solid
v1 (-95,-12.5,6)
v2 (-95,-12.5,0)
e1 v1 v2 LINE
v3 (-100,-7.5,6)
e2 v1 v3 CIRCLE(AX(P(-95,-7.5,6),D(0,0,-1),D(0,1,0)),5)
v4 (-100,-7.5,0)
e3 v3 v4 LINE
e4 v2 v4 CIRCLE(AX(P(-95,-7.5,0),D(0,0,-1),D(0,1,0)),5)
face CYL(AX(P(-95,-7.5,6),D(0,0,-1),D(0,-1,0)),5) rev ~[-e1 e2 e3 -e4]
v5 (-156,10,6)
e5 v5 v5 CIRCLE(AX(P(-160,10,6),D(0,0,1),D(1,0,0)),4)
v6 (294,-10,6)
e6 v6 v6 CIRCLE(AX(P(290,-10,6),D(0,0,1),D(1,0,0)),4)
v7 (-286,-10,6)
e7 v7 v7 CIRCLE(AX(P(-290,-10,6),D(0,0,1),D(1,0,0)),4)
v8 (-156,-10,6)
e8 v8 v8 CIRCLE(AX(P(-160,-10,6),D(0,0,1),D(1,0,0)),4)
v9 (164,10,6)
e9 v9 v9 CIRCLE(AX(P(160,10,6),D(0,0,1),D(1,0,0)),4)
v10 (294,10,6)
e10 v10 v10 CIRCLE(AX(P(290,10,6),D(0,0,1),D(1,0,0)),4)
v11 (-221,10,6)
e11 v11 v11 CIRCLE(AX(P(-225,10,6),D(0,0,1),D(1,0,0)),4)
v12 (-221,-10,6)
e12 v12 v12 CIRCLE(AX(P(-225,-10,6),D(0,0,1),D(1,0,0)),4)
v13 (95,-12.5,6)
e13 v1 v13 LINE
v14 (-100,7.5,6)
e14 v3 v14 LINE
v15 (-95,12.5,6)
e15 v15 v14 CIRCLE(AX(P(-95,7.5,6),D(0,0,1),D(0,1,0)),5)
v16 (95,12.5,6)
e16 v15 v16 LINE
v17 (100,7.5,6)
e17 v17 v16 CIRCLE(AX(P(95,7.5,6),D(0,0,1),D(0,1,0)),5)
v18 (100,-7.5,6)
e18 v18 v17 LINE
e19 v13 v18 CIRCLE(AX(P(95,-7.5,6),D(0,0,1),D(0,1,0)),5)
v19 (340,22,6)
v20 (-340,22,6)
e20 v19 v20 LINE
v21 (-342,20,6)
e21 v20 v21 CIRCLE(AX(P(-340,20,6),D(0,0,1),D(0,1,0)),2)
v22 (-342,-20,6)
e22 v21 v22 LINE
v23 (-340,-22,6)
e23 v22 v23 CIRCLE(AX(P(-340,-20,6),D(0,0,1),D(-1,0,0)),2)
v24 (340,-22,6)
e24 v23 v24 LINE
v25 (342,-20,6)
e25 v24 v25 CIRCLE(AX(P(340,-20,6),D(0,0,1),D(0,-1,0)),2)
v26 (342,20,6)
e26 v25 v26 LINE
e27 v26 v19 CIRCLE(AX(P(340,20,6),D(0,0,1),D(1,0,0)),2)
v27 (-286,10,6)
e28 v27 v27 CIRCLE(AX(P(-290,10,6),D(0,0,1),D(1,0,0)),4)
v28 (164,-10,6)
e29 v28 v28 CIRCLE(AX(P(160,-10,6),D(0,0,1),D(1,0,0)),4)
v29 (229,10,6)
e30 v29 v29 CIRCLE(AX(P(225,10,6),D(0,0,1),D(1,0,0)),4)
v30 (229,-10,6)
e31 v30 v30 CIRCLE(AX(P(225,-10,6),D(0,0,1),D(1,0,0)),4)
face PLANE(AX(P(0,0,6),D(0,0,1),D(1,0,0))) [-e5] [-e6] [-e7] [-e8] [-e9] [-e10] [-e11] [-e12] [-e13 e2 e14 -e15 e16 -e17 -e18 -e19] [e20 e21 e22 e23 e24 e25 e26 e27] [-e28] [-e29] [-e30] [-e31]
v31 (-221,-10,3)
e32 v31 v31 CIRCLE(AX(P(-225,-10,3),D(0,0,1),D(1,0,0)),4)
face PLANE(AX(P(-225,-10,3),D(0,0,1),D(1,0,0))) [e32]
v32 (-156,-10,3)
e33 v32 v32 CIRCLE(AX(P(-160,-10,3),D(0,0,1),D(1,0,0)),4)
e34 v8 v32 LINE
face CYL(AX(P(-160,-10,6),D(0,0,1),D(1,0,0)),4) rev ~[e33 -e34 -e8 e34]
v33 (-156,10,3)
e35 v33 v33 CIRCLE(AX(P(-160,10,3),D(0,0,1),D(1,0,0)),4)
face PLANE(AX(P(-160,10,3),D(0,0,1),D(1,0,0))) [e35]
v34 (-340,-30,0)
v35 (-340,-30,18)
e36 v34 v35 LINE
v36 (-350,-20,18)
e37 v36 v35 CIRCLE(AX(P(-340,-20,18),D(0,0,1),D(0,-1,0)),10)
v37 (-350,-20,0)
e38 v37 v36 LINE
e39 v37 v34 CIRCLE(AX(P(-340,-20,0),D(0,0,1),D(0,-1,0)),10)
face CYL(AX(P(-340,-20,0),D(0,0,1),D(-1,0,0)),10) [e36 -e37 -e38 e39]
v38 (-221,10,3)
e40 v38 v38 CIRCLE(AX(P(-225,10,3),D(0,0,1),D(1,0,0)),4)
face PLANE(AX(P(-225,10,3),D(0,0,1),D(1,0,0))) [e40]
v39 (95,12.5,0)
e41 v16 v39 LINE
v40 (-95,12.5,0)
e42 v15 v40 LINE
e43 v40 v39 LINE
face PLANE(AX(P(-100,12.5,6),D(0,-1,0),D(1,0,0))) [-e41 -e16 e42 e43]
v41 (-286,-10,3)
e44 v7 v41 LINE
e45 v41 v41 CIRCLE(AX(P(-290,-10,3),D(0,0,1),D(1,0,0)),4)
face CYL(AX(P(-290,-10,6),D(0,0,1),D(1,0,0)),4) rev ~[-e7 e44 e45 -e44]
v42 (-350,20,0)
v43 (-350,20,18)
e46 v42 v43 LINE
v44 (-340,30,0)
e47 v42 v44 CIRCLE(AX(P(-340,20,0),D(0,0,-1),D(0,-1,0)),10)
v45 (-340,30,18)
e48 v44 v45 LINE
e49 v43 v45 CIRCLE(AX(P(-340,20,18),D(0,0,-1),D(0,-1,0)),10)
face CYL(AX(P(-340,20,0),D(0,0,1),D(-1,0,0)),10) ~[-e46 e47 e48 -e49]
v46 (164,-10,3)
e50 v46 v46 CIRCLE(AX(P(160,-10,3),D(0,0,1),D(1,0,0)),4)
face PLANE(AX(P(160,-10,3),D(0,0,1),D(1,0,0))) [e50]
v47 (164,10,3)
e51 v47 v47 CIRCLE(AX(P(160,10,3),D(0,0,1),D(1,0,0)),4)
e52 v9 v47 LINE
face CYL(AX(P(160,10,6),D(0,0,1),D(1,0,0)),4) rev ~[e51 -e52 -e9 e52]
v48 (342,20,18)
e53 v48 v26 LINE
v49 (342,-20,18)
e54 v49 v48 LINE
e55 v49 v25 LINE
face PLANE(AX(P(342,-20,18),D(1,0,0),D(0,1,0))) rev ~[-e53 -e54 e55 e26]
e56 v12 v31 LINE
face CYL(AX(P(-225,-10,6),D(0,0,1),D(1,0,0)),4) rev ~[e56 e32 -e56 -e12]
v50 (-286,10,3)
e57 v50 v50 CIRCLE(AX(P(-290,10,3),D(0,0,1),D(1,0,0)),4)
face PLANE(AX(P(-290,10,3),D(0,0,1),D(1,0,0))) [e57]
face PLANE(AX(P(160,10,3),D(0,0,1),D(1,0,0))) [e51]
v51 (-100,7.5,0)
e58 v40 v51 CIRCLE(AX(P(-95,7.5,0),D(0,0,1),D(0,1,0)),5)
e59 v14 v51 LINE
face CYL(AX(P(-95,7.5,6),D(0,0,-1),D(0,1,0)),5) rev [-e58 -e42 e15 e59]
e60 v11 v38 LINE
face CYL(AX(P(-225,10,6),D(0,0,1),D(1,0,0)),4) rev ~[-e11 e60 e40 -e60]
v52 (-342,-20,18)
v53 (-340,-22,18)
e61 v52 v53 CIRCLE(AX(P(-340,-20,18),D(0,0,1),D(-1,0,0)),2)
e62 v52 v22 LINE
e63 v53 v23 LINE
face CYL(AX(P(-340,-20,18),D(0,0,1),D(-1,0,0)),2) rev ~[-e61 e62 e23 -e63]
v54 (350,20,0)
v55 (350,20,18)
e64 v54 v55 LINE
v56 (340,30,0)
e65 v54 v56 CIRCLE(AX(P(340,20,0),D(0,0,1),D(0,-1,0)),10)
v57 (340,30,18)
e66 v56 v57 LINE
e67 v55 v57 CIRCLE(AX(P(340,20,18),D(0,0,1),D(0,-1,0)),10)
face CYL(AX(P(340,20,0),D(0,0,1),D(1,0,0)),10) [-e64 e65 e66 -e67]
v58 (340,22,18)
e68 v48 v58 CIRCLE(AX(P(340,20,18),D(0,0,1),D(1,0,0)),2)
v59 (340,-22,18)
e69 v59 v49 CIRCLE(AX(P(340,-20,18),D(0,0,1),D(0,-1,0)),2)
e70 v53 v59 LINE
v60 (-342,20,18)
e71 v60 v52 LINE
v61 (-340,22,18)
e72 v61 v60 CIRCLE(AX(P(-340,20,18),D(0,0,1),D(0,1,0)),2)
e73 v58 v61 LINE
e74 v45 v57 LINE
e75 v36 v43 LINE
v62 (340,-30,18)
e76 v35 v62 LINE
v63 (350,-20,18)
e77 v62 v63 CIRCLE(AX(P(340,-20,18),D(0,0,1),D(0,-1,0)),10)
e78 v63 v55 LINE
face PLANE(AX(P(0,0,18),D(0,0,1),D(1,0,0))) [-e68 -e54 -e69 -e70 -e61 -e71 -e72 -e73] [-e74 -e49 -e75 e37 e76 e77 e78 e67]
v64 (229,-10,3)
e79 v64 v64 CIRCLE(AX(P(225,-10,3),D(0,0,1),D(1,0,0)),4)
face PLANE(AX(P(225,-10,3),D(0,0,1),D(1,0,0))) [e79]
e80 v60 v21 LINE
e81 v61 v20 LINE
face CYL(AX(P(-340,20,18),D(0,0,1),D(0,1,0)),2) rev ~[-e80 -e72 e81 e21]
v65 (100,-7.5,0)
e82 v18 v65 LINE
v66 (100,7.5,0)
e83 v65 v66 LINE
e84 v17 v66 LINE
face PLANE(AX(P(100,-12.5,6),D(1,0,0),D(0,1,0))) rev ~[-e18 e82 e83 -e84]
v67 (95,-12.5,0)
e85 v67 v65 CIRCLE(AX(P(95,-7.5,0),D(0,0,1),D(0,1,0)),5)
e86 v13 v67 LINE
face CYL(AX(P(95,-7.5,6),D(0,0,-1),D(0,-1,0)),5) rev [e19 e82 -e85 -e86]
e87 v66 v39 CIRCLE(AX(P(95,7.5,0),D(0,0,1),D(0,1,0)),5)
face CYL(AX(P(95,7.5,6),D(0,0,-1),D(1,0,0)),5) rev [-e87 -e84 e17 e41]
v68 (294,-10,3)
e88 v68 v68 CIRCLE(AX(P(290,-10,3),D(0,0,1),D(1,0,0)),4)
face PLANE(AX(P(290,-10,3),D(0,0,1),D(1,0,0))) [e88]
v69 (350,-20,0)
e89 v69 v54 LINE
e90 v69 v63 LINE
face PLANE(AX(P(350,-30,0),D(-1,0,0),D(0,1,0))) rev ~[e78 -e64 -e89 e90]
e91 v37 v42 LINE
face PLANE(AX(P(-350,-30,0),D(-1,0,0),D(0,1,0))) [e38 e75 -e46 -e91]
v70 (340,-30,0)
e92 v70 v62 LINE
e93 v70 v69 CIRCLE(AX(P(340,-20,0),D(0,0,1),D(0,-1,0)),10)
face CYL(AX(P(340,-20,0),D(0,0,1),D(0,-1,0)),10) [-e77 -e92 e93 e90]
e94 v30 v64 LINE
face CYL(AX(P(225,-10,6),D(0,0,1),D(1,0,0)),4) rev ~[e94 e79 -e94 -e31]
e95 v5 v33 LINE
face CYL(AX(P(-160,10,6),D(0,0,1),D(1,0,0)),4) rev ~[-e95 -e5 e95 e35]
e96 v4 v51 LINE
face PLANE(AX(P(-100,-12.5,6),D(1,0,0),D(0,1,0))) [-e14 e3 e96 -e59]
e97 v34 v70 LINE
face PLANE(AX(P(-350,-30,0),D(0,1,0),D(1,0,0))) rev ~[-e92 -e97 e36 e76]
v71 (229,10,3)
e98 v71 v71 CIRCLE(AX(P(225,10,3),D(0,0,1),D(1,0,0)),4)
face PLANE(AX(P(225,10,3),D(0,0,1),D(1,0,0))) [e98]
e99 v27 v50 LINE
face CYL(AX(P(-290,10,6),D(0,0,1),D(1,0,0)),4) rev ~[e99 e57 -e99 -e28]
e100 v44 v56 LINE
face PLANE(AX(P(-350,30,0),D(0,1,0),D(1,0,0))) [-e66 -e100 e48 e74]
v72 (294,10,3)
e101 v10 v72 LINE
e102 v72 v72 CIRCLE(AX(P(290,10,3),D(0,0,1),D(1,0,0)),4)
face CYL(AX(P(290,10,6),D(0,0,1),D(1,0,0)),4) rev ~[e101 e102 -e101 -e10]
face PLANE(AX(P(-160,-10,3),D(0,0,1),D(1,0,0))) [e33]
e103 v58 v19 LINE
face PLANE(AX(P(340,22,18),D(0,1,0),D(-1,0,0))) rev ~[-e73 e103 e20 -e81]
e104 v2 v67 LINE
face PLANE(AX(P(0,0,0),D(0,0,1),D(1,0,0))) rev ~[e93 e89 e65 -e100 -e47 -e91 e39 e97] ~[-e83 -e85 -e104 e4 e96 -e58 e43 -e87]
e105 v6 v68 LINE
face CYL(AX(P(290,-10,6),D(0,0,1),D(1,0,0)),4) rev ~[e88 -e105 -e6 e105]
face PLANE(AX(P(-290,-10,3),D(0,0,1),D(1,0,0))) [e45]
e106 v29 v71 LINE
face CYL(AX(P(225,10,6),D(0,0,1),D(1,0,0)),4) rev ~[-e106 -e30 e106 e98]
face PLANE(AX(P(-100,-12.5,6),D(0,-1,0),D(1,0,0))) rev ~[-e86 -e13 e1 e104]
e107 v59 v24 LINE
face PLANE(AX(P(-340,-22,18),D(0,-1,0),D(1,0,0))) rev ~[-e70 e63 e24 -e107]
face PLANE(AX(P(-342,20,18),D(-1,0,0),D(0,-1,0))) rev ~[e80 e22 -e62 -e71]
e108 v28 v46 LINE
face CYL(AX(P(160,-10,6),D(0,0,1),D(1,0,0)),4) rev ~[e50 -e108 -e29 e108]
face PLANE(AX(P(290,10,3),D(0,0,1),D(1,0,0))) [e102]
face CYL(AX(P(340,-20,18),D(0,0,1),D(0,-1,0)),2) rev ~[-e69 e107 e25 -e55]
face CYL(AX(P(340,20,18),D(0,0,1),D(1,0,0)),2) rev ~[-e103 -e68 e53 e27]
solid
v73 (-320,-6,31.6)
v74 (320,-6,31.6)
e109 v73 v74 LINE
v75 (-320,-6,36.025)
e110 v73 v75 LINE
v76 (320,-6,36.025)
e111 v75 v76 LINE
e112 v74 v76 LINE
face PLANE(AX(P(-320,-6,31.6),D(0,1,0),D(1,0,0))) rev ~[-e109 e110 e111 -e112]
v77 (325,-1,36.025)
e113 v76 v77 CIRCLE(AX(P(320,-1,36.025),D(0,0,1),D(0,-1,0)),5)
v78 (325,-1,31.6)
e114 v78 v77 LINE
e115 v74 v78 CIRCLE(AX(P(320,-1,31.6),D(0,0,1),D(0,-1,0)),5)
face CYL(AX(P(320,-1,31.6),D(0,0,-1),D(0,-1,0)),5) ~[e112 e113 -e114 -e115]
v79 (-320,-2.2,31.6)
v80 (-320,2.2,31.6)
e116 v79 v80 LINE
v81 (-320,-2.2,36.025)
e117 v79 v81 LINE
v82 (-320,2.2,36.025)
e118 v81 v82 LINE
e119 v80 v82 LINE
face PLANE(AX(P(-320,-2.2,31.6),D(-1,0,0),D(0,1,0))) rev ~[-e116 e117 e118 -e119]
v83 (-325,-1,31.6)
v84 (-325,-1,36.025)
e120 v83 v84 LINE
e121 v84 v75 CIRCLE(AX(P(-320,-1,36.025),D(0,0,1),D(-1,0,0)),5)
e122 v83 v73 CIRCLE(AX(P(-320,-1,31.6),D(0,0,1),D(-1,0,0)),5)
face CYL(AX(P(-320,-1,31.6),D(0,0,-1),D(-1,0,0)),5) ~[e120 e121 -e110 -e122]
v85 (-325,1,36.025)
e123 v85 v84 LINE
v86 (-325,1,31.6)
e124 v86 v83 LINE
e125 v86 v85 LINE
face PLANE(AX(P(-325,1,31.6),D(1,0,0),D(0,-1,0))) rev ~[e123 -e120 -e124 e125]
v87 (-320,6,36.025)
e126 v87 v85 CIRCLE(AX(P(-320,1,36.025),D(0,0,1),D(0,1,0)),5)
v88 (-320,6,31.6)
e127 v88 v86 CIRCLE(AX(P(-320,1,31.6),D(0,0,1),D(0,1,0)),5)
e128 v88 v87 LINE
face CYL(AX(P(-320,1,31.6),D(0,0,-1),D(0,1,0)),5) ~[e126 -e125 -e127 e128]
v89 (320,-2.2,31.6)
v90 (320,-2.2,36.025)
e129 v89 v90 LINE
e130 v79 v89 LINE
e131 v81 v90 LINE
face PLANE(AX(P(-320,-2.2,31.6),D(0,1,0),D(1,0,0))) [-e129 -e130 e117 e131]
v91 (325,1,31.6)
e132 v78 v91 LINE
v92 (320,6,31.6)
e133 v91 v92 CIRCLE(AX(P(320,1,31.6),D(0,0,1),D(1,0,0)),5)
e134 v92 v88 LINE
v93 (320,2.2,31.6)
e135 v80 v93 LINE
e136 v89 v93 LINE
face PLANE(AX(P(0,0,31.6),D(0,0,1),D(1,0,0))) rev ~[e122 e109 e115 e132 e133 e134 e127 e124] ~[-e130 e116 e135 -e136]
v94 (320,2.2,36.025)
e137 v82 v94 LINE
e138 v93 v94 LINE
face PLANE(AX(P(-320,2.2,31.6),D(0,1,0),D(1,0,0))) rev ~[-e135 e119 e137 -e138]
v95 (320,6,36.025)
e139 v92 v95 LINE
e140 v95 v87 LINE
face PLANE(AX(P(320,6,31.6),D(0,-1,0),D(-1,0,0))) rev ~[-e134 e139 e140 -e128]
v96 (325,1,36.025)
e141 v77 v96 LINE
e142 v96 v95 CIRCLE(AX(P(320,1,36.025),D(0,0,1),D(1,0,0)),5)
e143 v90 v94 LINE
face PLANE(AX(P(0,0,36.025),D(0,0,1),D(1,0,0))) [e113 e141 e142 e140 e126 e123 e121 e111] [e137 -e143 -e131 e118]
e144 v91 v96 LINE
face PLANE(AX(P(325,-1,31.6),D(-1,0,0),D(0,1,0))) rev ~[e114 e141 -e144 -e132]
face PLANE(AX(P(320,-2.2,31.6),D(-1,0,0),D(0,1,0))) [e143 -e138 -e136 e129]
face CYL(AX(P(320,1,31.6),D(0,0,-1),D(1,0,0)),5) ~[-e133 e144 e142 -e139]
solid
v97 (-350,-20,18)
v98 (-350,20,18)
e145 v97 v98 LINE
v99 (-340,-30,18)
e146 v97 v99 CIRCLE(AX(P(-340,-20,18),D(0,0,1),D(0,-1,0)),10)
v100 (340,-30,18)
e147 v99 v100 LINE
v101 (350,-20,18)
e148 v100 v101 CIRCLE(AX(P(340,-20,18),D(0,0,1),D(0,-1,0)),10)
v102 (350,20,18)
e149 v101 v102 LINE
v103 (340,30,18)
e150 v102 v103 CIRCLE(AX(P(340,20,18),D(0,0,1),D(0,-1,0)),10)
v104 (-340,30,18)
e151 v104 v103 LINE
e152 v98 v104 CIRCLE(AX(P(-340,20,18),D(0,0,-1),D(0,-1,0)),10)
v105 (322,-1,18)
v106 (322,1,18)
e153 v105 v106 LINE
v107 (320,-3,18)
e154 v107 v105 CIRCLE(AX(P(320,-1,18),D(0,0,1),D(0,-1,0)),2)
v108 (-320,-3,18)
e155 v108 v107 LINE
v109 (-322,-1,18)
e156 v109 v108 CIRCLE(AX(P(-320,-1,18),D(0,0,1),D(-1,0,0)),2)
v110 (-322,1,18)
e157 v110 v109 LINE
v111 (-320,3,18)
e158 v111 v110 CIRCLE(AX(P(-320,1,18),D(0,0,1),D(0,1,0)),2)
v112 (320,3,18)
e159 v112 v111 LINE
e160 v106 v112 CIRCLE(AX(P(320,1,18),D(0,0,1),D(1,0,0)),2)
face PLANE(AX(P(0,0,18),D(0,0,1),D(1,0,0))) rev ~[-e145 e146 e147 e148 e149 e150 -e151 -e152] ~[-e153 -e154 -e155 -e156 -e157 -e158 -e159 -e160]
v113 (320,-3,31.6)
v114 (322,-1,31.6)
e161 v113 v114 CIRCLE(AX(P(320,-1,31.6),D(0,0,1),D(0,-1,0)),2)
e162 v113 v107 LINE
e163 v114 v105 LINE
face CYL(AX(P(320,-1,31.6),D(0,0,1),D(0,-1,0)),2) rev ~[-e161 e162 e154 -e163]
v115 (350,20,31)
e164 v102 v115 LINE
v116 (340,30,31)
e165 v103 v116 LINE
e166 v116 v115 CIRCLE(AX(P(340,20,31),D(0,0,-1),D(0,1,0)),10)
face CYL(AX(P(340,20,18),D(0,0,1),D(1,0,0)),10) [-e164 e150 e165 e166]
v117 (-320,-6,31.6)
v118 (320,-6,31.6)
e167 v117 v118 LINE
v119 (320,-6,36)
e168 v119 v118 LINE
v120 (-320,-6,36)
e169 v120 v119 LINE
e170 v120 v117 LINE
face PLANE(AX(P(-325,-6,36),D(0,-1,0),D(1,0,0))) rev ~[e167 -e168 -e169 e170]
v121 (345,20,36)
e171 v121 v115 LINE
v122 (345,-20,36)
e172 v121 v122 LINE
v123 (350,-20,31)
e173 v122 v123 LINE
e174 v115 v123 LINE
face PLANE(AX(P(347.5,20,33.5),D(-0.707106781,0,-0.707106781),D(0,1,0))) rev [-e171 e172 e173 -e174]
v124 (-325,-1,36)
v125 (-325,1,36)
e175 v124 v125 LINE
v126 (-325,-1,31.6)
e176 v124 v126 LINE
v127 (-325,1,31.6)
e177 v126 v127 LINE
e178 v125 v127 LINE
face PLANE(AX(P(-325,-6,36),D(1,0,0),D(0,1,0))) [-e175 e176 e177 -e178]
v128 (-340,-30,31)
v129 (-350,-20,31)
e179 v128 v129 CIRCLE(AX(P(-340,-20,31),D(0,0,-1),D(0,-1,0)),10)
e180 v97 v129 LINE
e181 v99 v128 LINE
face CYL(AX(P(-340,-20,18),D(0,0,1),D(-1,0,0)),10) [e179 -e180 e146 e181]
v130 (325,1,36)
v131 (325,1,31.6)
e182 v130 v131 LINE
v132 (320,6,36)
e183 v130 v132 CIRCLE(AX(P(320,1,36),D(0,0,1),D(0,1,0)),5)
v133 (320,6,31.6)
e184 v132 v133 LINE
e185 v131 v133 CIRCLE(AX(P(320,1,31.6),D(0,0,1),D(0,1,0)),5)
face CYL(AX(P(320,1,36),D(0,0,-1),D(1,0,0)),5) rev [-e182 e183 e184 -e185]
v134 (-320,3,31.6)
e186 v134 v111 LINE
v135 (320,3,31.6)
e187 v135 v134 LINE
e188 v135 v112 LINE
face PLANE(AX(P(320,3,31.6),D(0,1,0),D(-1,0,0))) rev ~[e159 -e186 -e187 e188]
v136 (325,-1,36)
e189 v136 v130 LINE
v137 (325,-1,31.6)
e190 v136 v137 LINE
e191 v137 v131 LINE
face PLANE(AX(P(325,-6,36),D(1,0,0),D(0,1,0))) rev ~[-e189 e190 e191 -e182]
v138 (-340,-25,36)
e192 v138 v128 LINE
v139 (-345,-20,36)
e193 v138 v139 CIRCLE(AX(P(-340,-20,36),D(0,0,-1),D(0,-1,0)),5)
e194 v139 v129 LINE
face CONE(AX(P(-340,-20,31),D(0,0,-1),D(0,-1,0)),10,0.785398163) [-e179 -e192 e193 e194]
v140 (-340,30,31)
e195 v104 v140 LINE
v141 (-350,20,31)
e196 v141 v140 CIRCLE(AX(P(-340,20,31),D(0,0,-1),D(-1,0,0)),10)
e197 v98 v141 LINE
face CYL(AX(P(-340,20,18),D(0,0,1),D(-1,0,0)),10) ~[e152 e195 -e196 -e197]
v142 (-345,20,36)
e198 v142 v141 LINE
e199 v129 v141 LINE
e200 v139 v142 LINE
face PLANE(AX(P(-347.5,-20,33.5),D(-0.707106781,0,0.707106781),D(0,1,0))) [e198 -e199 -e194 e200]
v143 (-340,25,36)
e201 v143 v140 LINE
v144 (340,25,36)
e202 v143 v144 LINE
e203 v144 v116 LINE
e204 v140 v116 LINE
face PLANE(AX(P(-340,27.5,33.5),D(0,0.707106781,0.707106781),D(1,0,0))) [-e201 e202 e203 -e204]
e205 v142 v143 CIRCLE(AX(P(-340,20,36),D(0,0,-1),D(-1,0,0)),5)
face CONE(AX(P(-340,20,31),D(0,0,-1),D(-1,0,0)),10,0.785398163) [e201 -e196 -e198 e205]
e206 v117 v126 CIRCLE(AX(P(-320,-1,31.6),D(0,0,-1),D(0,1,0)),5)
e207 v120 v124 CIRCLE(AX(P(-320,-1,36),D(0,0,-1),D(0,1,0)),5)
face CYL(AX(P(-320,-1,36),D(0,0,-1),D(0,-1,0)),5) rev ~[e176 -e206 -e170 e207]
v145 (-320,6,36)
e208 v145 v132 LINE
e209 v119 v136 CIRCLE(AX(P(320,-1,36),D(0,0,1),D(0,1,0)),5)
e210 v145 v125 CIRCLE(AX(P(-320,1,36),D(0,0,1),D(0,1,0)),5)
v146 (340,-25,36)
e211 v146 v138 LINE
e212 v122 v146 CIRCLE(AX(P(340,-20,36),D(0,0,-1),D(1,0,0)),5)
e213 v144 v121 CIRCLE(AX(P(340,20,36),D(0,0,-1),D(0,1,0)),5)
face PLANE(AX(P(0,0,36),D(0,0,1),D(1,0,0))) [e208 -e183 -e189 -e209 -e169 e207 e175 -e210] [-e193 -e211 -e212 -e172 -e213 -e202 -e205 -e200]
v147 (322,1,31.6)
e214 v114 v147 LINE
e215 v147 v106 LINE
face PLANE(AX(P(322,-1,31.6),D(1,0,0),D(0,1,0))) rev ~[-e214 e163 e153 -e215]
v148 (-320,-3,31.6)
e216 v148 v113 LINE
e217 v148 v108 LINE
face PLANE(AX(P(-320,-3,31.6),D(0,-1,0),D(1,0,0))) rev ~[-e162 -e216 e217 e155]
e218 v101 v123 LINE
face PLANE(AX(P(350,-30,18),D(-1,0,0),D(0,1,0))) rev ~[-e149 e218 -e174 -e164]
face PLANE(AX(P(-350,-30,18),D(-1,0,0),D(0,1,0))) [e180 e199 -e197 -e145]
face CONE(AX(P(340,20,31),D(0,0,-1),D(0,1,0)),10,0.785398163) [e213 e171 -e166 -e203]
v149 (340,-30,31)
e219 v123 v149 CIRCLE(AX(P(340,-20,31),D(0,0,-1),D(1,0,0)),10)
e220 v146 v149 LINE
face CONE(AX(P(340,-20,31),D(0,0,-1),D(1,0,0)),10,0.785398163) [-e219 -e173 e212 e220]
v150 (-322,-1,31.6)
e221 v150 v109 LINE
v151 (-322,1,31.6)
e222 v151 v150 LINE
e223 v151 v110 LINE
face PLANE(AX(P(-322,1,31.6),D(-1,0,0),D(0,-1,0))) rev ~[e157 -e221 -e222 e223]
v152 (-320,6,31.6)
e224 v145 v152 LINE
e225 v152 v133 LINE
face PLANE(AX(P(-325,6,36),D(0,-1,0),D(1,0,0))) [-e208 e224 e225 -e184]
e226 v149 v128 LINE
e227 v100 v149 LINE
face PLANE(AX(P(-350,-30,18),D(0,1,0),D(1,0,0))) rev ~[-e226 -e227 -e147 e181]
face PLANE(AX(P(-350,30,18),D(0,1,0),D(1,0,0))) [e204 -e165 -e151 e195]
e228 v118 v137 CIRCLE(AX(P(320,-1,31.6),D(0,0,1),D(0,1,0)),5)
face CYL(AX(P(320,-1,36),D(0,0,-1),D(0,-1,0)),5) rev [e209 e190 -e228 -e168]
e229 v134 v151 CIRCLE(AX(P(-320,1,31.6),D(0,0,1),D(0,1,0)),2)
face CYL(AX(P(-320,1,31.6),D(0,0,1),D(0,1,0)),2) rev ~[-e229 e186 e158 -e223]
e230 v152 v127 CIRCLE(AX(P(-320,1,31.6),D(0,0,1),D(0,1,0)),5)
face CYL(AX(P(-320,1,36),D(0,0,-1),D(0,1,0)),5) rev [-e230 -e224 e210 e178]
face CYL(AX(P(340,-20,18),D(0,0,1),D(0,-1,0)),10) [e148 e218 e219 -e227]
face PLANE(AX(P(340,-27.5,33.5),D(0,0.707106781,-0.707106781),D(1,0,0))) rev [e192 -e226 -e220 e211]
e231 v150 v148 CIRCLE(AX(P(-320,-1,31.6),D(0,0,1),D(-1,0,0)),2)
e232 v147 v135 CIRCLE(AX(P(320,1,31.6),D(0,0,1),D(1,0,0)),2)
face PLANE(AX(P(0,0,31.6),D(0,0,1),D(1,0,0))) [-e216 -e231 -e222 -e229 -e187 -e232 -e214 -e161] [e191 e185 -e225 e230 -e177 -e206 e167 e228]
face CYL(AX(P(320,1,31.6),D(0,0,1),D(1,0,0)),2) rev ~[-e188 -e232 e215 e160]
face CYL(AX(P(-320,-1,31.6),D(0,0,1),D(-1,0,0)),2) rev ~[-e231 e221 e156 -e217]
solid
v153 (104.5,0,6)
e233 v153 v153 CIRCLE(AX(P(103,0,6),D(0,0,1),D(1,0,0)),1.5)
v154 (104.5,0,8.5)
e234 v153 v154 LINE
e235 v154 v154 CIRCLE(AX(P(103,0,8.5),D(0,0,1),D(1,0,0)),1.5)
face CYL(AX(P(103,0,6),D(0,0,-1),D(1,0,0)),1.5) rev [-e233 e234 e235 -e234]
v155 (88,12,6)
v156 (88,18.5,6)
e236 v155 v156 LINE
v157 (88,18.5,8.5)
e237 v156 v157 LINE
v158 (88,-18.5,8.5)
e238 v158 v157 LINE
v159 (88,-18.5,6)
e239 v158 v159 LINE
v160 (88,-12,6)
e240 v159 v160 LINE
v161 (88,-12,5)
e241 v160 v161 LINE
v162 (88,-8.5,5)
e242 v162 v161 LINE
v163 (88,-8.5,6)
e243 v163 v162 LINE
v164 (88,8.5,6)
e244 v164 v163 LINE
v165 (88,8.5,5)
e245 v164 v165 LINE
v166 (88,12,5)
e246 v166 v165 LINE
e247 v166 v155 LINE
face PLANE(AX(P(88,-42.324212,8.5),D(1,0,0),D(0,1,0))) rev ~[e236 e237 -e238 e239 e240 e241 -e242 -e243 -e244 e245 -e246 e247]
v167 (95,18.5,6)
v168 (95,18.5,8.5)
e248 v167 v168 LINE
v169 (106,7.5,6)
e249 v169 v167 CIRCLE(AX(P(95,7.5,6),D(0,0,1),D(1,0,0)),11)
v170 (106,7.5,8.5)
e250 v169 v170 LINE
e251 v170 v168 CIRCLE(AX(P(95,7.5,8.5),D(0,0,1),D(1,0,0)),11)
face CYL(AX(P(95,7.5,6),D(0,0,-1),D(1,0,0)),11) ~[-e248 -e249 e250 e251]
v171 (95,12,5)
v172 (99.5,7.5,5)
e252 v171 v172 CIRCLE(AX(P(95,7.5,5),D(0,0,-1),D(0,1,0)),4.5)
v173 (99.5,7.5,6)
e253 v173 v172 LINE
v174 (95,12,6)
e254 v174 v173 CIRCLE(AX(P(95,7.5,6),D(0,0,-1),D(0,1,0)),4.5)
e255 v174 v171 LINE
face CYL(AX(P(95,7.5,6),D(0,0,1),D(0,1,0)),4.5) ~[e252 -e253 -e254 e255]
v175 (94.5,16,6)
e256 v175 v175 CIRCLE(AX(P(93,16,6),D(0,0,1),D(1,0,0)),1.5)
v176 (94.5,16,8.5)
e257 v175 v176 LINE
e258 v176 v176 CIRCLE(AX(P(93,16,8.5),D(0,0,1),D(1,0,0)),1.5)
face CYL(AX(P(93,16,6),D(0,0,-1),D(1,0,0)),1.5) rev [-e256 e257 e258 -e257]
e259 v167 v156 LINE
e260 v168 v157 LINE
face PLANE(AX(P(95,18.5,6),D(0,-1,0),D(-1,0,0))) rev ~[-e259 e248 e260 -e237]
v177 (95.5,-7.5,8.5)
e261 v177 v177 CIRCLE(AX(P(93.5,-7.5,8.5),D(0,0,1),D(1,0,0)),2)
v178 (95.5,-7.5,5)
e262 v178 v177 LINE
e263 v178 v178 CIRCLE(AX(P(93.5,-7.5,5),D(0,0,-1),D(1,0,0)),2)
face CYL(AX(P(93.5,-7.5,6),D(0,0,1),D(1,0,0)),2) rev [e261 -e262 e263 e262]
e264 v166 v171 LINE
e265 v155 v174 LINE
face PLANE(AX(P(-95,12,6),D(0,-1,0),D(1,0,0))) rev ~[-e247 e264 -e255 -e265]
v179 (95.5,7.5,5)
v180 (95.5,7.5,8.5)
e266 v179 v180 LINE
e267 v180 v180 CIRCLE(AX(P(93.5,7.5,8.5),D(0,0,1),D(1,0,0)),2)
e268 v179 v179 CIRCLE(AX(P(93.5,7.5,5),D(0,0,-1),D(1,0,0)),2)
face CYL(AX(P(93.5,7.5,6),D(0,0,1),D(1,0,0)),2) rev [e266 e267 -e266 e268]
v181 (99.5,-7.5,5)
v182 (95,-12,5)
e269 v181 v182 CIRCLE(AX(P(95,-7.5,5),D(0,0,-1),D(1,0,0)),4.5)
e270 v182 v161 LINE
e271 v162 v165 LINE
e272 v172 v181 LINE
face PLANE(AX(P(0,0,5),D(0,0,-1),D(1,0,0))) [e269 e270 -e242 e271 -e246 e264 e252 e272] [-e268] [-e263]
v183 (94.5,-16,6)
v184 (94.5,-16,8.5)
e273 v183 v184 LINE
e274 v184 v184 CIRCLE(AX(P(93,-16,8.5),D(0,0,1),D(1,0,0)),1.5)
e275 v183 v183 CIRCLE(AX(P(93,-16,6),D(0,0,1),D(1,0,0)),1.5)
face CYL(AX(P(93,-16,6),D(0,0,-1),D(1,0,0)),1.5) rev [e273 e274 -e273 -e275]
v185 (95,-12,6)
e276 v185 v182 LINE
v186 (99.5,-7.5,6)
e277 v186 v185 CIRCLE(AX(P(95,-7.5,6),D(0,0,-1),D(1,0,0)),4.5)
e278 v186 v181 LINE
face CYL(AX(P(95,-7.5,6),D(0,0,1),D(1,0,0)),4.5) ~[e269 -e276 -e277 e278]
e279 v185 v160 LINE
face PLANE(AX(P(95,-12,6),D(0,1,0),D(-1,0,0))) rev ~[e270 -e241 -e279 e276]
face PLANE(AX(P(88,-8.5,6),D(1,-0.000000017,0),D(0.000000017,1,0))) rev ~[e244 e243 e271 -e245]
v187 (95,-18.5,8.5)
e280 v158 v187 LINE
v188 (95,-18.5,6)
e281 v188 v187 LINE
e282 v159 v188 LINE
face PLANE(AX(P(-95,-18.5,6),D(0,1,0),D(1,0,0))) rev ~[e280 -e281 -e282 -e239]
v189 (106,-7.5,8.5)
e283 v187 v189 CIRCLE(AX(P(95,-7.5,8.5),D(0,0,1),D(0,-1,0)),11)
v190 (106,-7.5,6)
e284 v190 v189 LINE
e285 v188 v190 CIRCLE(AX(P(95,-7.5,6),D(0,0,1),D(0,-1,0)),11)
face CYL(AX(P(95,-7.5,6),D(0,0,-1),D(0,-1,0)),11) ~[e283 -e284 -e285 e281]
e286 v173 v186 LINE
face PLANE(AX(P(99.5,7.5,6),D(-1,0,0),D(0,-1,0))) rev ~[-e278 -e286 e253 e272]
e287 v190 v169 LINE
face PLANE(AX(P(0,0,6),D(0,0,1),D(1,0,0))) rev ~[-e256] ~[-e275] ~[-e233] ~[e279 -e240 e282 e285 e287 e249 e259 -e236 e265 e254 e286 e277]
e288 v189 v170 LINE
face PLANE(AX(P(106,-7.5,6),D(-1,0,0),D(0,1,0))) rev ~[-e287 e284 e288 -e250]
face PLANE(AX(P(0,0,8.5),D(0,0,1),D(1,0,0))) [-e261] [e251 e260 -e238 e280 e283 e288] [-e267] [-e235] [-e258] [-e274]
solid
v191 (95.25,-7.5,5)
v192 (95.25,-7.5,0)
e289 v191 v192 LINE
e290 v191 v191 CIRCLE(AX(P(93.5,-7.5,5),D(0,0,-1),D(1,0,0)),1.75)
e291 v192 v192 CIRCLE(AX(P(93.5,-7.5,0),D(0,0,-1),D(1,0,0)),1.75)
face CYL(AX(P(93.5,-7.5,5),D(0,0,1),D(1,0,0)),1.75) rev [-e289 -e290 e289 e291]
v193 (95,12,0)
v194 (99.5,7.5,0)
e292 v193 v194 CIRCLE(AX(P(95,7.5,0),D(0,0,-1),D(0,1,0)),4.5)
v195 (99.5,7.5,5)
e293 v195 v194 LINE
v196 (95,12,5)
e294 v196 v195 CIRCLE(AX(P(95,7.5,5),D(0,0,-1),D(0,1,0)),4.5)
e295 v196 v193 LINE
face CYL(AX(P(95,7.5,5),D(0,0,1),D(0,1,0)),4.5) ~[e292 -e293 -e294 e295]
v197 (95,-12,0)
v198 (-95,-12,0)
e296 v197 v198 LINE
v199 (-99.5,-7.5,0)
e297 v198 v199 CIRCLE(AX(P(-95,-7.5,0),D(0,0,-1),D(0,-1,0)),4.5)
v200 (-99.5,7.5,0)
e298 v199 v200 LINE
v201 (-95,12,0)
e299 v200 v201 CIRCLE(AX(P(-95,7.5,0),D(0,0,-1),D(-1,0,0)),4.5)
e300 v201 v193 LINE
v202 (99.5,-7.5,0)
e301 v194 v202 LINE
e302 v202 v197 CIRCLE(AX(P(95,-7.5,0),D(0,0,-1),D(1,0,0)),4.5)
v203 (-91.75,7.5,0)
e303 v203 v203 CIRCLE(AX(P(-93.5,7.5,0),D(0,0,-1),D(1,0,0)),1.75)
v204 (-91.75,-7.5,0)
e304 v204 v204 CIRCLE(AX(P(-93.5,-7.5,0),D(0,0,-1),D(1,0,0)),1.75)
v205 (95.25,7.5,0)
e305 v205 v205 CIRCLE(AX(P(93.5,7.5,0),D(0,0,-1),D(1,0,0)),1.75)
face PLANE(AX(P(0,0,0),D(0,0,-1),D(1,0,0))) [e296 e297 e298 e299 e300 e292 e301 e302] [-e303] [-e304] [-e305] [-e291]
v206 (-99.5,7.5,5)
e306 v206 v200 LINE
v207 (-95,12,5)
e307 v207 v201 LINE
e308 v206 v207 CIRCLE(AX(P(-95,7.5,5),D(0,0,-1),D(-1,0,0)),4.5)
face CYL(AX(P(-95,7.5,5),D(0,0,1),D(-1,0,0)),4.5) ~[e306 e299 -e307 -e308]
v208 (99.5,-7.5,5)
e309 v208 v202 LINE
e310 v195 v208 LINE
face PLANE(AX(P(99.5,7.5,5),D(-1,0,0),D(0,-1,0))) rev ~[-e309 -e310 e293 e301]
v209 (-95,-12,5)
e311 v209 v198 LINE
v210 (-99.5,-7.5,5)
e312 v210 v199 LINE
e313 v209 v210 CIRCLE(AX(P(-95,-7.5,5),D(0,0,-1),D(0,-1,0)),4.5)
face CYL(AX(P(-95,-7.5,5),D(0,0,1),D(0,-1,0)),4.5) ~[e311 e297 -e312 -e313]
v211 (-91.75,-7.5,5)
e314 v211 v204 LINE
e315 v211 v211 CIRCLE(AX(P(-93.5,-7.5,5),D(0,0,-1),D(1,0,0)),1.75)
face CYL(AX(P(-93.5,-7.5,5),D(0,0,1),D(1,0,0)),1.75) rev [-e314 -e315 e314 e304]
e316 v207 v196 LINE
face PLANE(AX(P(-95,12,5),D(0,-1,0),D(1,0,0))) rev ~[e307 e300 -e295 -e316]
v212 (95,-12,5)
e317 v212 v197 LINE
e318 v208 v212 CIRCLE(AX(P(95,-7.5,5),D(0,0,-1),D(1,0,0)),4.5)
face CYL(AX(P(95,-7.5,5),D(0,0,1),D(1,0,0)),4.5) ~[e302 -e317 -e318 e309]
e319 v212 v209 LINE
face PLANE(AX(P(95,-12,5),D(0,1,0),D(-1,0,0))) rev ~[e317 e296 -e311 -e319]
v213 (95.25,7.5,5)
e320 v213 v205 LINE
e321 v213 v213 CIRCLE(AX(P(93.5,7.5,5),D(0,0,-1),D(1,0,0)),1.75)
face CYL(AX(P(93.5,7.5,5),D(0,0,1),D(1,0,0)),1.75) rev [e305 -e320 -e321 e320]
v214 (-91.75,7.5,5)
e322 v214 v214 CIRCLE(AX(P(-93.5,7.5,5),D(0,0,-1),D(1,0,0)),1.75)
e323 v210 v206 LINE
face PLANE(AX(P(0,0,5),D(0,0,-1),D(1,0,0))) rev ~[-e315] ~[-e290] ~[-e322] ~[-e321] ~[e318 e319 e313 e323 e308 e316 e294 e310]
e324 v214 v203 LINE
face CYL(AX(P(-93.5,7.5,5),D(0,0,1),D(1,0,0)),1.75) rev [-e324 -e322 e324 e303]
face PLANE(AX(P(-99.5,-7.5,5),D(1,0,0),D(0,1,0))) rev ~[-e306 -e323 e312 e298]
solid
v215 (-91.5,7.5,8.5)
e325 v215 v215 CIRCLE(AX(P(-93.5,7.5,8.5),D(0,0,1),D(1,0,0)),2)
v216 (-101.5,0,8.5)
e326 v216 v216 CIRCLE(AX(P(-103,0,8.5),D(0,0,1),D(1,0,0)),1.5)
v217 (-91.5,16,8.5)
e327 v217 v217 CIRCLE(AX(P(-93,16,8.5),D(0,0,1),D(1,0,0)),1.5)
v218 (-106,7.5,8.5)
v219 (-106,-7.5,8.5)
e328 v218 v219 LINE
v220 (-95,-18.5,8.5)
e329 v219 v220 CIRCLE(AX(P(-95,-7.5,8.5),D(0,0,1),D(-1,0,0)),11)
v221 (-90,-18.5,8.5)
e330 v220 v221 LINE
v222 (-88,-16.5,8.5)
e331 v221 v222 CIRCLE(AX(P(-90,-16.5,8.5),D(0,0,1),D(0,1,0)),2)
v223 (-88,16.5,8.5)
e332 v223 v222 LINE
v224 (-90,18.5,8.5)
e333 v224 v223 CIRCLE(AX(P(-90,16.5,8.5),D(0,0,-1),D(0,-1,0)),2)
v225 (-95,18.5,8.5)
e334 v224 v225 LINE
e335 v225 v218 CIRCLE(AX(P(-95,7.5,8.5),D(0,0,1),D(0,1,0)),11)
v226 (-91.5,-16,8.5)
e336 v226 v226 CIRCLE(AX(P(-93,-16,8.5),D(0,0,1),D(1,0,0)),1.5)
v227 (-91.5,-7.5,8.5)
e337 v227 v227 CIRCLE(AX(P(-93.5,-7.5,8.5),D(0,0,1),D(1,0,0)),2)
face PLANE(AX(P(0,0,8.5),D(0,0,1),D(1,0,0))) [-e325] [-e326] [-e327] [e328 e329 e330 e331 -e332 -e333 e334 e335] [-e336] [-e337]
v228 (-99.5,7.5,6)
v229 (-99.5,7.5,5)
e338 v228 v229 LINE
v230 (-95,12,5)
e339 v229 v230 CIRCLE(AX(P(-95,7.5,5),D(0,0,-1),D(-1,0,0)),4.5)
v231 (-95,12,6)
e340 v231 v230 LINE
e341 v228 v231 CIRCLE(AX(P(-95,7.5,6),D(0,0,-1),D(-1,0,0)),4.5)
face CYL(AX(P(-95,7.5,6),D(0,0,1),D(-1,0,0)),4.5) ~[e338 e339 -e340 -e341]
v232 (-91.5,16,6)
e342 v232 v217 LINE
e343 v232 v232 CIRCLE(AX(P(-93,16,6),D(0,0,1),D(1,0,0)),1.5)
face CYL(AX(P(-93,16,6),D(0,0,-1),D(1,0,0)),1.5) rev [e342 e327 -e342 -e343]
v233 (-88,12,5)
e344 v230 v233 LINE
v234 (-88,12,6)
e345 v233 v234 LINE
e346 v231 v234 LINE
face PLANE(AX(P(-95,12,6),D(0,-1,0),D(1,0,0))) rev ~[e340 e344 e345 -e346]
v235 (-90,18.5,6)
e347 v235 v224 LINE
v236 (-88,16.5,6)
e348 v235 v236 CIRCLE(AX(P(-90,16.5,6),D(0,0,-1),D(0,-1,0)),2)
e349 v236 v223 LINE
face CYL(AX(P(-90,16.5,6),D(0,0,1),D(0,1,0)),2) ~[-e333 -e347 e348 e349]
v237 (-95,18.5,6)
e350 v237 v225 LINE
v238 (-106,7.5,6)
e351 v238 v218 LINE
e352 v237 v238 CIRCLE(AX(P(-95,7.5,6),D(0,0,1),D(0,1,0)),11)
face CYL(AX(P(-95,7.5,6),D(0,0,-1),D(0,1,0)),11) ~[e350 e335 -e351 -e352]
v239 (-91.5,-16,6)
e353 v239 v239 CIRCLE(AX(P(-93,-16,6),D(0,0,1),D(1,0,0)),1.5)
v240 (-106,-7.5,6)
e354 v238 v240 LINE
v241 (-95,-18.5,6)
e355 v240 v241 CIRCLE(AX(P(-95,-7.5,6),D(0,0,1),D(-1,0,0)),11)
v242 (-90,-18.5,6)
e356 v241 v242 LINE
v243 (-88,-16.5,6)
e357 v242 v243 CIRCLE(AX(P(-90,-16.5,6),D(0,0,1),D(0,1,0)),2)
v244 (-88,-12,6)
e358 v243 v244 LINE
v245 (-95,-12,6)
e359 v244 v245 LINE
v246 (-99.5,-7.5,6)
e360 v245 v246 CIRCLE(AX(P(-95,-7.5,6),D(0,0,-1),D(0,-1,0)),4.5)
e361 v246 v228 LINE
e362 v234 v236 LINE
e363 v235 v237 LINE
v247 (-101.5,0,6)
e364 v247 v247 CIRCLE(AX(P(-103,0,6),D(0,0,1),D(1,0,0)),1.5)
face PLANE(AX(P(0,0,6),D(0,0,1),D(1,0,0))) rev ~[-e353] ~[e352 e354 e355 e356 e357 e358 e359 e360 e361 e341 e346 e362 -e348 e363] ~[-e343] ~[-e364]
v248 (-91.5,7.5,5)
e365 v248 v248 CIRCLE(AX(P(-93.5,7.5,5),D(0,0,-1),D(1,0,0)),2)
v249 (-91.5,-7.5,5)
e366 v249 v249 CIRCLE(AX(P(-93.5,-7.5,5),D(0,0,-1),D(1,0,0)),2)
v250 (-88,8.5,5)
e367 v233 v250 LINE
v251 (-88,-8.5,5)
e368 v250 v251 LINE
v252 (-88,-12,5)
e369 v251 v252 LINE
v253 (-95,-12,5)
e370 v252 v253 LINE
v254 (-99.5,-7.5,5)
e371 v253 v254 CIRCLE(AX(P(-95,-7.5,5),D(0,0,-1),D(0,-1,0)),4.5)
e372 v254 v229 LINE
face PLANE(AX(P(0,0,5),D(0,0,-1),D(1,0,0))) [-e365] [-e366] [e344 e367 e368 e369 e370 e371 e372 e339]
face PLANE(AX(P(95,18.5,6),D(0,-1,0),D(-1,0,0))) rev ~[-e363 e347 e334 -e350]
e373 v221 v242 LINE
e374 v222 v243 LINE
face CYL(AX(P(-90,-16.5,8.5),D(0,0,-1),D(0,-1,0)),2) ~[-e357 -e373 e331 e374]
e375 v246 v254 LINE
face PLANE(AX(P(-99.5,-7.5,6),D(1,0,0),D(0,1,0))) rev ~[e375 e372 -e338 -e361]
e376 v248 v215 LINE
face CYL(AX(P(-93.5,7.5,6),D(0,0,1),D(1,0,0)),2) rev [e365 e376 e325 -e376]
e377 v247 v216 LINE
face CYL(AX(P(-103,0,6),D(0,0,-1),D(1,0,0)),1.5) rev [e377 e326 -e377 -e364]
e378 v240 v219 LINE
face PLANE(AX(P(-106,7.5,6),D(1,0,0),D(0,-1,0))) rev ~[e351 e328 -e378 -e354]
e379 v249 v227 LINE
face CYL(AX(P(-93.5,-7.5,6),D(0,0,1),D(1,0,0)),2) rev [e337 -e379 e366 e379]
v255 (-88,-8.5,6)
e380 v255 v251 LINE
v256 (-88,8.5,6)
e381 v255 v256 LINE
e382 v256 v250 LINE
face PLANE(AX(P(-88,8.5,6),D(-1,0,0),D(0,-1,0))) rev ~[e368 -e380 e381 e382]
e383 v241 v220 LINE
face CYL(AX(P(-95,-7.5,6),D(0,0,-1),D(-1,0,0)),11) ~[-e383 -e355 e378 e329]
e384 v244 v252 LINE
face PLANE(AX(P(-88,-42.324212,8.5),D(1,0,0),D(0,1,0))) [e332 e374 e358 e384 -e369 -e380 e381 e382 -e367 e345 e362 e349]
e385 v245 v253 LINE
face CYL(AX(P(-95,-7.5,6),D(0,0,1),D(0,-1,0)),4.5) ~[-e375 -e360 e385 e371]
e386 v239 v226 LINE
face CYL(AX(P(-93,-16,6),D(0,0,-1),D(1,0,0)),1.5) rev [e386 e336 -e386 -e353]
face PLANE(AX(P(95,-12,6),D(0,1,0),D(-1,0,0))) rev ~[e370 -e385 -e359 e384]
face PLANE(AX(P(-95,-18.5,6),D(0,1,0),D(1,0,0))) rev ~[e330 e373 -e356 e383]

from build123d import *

# Parameters (mm, degrees)
F0_W      = 700
F0_H      = 60
F1_DEPTH  = 18
F2_DEPTH  = 18
F3_R      = 10
F3_2_R    = 10
F4_SIZE   = 5
F5_W      = 650
F5_H      = 12
F6_DEPTH  = 4.4
F7_R      = 5
F9_DEPTH  = 25
F11_DEPTH = 12
F12_W     = 200
F12_H     = 25
F13_DEPTH = 25
F14_R     = 5
F15_R     = 4
F16_DEPTH = 3
F17_W     = 640
F17_H     = 4.4
F18_DEPTH = 4.425
F19_R     = 1.5
F19_R_2   = 2
F20_DEPTH = 2.5
F21_R     = 2
F22_DEPTH = 1
F23_R     = 1.75
F24_DEPTH = 5
F25_W     = 176
F25_H     = 84.6484244061
F26_DEPTH = 25
F27_R     = 2


# Not quite as in the source:
# - ends of sketch curves that miss each other by under 0.0002 mm in the source are joined


with BuildPart() as f1:
    # F0 (on Top) → F1 (new body)
    with BuildSketch(Plane.XY):
        Rectangle(F0_W, F0_H)
    extrude(amount=F1_DEPTH)


with BuildPart() as f2:
    # F2 (new): a face of the model
    f2_faces = [f1.part.faces().sort_by_distance(p)[0] for p in [
        (0, 0, 18),
    ]]
    extrude(f2_faces, amount=F2_DEPTH)

    # F3#2
    f3_2_edges = [f2.edges().sort_by_distance(p)[0] for p in [
        (-350, -30, 27),
        (350, -30, 27),
        (350, 30, 27),
        (-350, 30, 27),
    ]]
    fillet(f3_2_edges, radius=F3_2_R)

    # F4
    f4_edges = [f2.edges().sort_by_distance(p)[0] for p in [
        (0, 30, 36),
        (350, 0, 36),
        (347.071068, -27.071068, 36),
        (347.071068, 27.071068, 36),
        (0, -30, 36),
        (-347.071068, -27.071068, 36),
        (-347.071068, 27.071068, 36),
        (-350, 0, 36),
    ]]
    chamfer(f4_edges, length=F4_SIZE)

    # F5 (on face) → F6 (cut)
    with BuildSketch(Plane.XY.offset(36)):
        Rectangle(F5_W, F5_H)
    extrude(amount=-F6_DEPTH, mode=Mode.SUBTRACT)

    # F7
    f7_edges = [f2.edges().sort_by_distance(p)[0] for p in [
        (-325, 6, 33.8),
        (-325, -6, 33.8),
        (325, 6, 33.8),
        (325, -6, 33.8),
    ]]
    fillet(f7_edges, radius=F7_R)


with BuildPart() as f1_1:
    add(f1.part)

    # F3
    f3_edges = [f1_1.edges().sort_by_distance(p)[0] for p in [
        (-350, -30, 9),
        (350, -30, 9),
        (350, 30, 9),
        (-350, 30, 9),
    ]]
    fillet(f3_edges, radius=F3_R)


with BuildPart() as f9_tool:
    # F8 (on face) → F9 (new body)
    with BuildSketch(Plane.XY.offset(31.6)):
        with BuildLine():
            Line((320, 3), (-320, 3))
            ThreePointArc((-320, 3), (-321.4142135624, 2.4142135624), (-322, 1))
            Line((-322, 1), (-322, -1))
            ThreePointArc((-322, -1), (-321.4142135624, -2.4142135624), (-320, -3))
            Line((-320, -3), (320, -3))
            ThreePointArc((320, -3), (321.4142135624, -2.4142135624), (322, -1))
            Line((322, -1), (322, 1))
            ThreePointArc((322, 1), (321.4142135624, 2.4142135624), (320, 3))
        make_face()
    extrude(amount=-F9_DEPTH)


with BuildPart() as f1_2:
    add(f1_1.part)

    # F9: cut by f9_tool
    add(f9_tool.part, mode=Mode.SUBTRACT)

    # F10 (on face) → F11 (cut)
    with BuildSketch(Plane.XY.offset(18)):
        with BuildLine():
            Line((-342, 20), (-342, -20))
            ThreePointArc((-342, -20), (-341.4142135624, -21.4142135624), (-340, -22))
            Line((-340, -22), (340, -22))
            ThreePointArc((340, -22), (341.4142135624, -21.4142135624), (342, -20))
            Line((342, -20), (342, 20))
            ThreePointArc((342, 20), (341.4142135624, 21.4142135624), (340, 22))
            Line((340, 22), (-340, 22))
            ThreePointArc((-340, 22), (-341.4142135624, 21.4142135624), (-342, 20))
        make_face()
    extrude(amount=-F11_DEPTH, mode=Mode.SUBTRACT)

    # F12 (on face) → F13 (cut)
    with BuildSketch(Plane.XY.offset(6)):
        Rectangle(F12_W, F12_H)
    extrude(amount=-F13_DEPTH, mode=Mode.SUBTRACT)

    # F14
    f14_edges = [f1_2.edges().sort_by_distance(p)[0] for p in [
        (100, 12.5, 3),
        (100, -12.5, 3),
        (-100, -12.5, 3),
        (-100, 12.5, 3),
    ]]
    fillet(f14_edges, radius=F14_R)

    # F15 (on face) → F16 (cut)
    with BuildSketch(Plane.XY.offset(6)):
        with Locations((-225, -10)):
            Circle(F15_R)
        with Locations((-225, 10)):
            Circle(F15_R)
        with Locations((-160, 10)):
            Circle(F15_R)
        with Locations((-160, -10)):
            Circle(F15_R)
        with Locations((-290, 10)):
            Circle(F15_R)
        with Locations((-290, -10)):
            Circle(F15_R)
        with Locations((290, -10)):
            Circle(F15_R)
        with Locations((160, 10)):
            Circle(F15_R)
        with Locations((225, 10)):
            Circle(F15_R)
        with Locations((225, -10)):
            Circle(F15_R)
        with Locations((290, 10)):
            Circle(F15_R)
        with Locations((160, -10)):
            Circle(F15_R)
    extrude(amount=-F16_DEPTH, mode=Mode.SUBTRACT)


with BuildPart() as f2_1:
    add(f2.part)

    # F9: cut by f9_tool
    add(f9_tool.part, mode=Mode.SUBTRACT)


with BuildPart() as f18:
    # F17 (on face) → F18 (new body)
    with BuildSketch(Plane.XY.offset(31.6)):
        with BuildLine():
            Line((320, 6), (-320, 6))
            ThreePointArc((-320, 6), (-323.5355339059, 4.5355339059), (-325, 1))
            Line((-325, 1), (-325, -1))
            ThreePointArc((-325, -1), (-323.5355339059, -4.5355339059), (-320, -6))
            Line((-320, -6), (320, -6))
            ThreePointArc((320, -6), (323.5355339059, -4.5355339059), (325, -1))
            Line((325, -1), (325, 1))
            ThreePointArc((325, 1), (323.5355339059, 4.5355339059), (320, 6))
        make_face()
        Rectangle(F17_W, F17_H, mode=Mode.SUBTRACT)
    extrude(amount=F18_DEPTH)


with BuildPart() as f20:
    # F19 (on face) → F20 (new body)
    with BuildSketch(Plane.XY.offset(6)):
        with BuildLine():
            ThreePointArc((-95, 18.5), (-102.7781745931, 15.2781745931), (-106, 7.5))
            Line((-106, 7.5), (-106, -7.5))
            ThreePointArc((-106, -7.5), (-102.7781745931, -15.2781745931), (-95, -18.5))
            Line((-95, -18.5), (95, -18.5))
            ThreePointArc((95, -18.5), (102.7781745931, -15.2781745931), (106, -7.5))
            Line((106, -7.5), (106, 7.5))
            ThreePointArc((106, 7.5), (102.7781745931, 15.2781745931), (95, 18.5))
            Line((95, 18.5), (-95, 18.5))
        make_face()
        with Locations((-93, -16)):
            Circle(F19_R, mode=Mode.SUBTRACT)
        with Locations((-25, -16)):
            Circle(F19_R, mode=Mode.SUBTRACT)
        with Locations((-93.5, -7.5)):
            Circle(F19_R_2, mode=Mode.SUBTRACT)
        with Locations((93, -16)):
            Circle(F19_R, mode=Mode.SUBTRACT)
        with Locations((93.5, -7.5)):
            Circle(F19_R_2, mode=Mode.SUBTRACT)
        with Locations((-103, 0)):
            Circle(F19_R, mode=Mode.SUBTRACT)
        with Locations((-93.5, 7.5)):
            Circle(F19_R_2, mode=Mode.SUBTRACT)
        with Locations((-93, 16)):
            Circle(F19_R, mode=Mode.SUBTRACT)
        with Locations((-25, 16)):
            Circle(F19_R, mode=Mode.SUBTRACT)
        with BuildLine():
            ThreePointArc((-88, 8.5), (-87.4142135624, 9.9142135624), (-86, 10.5))
            Line((-86, 10.5), (86, 10.5))
            ThreePointArc((86, 10.5), (87.4142135624, 9.9142135624), (88, 8.5))
            Line((88, 8.5), (88, -8.5))
            ThreePointArc((88, -8.5), (87.4142135624, -9.9142135624), (86, -10.5))
            Line((86, -10.5), (-86, -10.5))
            ThreePointArc((-86, -10.5), (-87.4142135624, -9.9142135624), (-88, -8.5))
            Line((-88, -8.5), (-88, 8.5))
        make_face(mode=Mode.SUBTRACT)
        with Locations((103, 0)):
            Circle(F19_R, mode=Mode.SUBTRACT)
        with Locations((93.5, 7.5)):
            Circle(F19_R_2, mode=Mode.SUBTRACT)
        with Locations((25, 16)):
            Circle(F19_R, mode=Mode.SUBTRACT)
        with Locations((93, 16)):
            Circle(F19_R, mode=Mode.SUBTRACT)
    extrude(amount=F20_DEPTH)

    # F21 (on face) → F22 (join)
    with BuildSketch(Plane(origin=(0, 0, 6), x_dir=(1, 0, 0), z_dir=(0, 0, -1))):
        with BuildLine():
            Line((-99.5, 7.5), (-99.5, -7.5))
            ThreePointArc((-99.5, -7.5), (-98.1819805153, -10.6819805153), (-95, -12))
            Line((-95, -12), (95, -12))
            ThreePointArc((95, -12), (98.1819805153, -10.6819805153), (99.5, -7.5))
            Line((99.5, -7.5), (99.5, 7.5))
            ThreePointArc((99.5, 7.5), (98.1819805153, 10.6819805153), (95, 12))
            Line((95, 12), (-95, 12))
            ThreePointArc((-95, 12), (-98.1819805153, 10.6819805153), (-99.5, 7.5))
        make_face()
        with Locations((-93.5, -7.5)):
            Circle(F21_R, mode=Mode.SUBTRACT)
        with Locations((93.5, -7.5)):
            Circle(F21_R, mode=Mode.SUBTRACT)
        with BuildLine():
            Line((-88.0000001416, -8.5), (-88.0000001416, 8.5))
            ThreePointArc((-88.0000001416, 8.5), (-87.4142134623, 9.9142134623), (-86, 10.4999998584))
            Line((-86, 10.4999998584), (86, 10.5000001416))
            ThreePointArc((86, 10.5000001416), (87.4142134623, 9.9142134623), (87.9999998584, 8.5))
            Line((87.9999998584, 8.5), (88.0000001416, -8.5))
            ThreePointArc((88.0000001416, -8.5), (87.4142134623, -9.9142134623), (86, -10.4999998584))
            Line((86, -10.4999998584), (-86, -10.5000001416))
            ThreePointArc((-86, -10.5000001416), (-87.4142134623, -9.9142134623), (-88.0000001416, -8.5))
        make_face(mode=Mode.SUBTRACT)
        with Locations((-93.5, 7.5)):
            Circle(F21_R, mode=Mode.SUBTRACT)
        with Locations((93.5, 7.5)):
            Circle(F21_R, mode=Mode.SUBTRACT)
    extrude(amount=F22_DEPTH)

    # F25 (on face) → F26 (cut)
    with BuildSketch(Plane.XY.offset(8.5)):
        Rectangle(F25_W, F25_H)
    extrude(amount=-F26_DEPTH, mode=Mode.SUBTRACT)

    # F27
    f27_edges = [f20.edges().sort_by_distance(p)[0] for p in [
        (-88, 18.5, 7.25),
        (-88, -18.5, 7.25),
    ]]
    fillet(f27_edges, radius=F27_R)


with BuildPart() as f24:
    # F23 (on face) → F24 (new body)
    with BuildSketch(Plane(origin=(0, 0, 5), x_dir=(1, 0, 0), z_dir=(0, 0, -1))):
        with BuildLine():
            ThreePointArc((-95, 12), (-98.1819805153, 10.6819805153), (-99.5, 7.5))
            Line((-99.5, 7.5), (-99.5, -7.5))
            ThreePointArc((-99.5, -7.5), (-98.1819805153, -10.6819805153), (-95, -12))
            Line((-95, -12), (95, -12))
            ThreePointArc((95, -12), (98.1819805153, -10.6819805153), (99.5, -7.5))
            Line((99.5, -7.5), (99.5, 7.5))
            ThreePointArc((99.5, 7.5), (98.1819805153, 10.6819805153), (95, 12))
            Line((95, 12), (-95, 12))
        make_face()
        with Locations((-93.5, -7.5)):
            Circle(F23_R, mode=Mode.SUBTRACT)
        with Locations((93.5, -7.5)):
            Circle(F23_R, mode=Mode.SUBTRACT)
        with Locations((-93.5, 7.5)):
            Circle(F23_R, mode=Mode.SUBTRACT)
        with Locations((93.5, 7.5)):
            Circle(F23_R, mode=Mode.SUBTRACT)
    extrude(amount=F24_DEPTH)


solid = Compound([f1_2.part, f2_1.part, f18.part, f20.part, f24.part])
